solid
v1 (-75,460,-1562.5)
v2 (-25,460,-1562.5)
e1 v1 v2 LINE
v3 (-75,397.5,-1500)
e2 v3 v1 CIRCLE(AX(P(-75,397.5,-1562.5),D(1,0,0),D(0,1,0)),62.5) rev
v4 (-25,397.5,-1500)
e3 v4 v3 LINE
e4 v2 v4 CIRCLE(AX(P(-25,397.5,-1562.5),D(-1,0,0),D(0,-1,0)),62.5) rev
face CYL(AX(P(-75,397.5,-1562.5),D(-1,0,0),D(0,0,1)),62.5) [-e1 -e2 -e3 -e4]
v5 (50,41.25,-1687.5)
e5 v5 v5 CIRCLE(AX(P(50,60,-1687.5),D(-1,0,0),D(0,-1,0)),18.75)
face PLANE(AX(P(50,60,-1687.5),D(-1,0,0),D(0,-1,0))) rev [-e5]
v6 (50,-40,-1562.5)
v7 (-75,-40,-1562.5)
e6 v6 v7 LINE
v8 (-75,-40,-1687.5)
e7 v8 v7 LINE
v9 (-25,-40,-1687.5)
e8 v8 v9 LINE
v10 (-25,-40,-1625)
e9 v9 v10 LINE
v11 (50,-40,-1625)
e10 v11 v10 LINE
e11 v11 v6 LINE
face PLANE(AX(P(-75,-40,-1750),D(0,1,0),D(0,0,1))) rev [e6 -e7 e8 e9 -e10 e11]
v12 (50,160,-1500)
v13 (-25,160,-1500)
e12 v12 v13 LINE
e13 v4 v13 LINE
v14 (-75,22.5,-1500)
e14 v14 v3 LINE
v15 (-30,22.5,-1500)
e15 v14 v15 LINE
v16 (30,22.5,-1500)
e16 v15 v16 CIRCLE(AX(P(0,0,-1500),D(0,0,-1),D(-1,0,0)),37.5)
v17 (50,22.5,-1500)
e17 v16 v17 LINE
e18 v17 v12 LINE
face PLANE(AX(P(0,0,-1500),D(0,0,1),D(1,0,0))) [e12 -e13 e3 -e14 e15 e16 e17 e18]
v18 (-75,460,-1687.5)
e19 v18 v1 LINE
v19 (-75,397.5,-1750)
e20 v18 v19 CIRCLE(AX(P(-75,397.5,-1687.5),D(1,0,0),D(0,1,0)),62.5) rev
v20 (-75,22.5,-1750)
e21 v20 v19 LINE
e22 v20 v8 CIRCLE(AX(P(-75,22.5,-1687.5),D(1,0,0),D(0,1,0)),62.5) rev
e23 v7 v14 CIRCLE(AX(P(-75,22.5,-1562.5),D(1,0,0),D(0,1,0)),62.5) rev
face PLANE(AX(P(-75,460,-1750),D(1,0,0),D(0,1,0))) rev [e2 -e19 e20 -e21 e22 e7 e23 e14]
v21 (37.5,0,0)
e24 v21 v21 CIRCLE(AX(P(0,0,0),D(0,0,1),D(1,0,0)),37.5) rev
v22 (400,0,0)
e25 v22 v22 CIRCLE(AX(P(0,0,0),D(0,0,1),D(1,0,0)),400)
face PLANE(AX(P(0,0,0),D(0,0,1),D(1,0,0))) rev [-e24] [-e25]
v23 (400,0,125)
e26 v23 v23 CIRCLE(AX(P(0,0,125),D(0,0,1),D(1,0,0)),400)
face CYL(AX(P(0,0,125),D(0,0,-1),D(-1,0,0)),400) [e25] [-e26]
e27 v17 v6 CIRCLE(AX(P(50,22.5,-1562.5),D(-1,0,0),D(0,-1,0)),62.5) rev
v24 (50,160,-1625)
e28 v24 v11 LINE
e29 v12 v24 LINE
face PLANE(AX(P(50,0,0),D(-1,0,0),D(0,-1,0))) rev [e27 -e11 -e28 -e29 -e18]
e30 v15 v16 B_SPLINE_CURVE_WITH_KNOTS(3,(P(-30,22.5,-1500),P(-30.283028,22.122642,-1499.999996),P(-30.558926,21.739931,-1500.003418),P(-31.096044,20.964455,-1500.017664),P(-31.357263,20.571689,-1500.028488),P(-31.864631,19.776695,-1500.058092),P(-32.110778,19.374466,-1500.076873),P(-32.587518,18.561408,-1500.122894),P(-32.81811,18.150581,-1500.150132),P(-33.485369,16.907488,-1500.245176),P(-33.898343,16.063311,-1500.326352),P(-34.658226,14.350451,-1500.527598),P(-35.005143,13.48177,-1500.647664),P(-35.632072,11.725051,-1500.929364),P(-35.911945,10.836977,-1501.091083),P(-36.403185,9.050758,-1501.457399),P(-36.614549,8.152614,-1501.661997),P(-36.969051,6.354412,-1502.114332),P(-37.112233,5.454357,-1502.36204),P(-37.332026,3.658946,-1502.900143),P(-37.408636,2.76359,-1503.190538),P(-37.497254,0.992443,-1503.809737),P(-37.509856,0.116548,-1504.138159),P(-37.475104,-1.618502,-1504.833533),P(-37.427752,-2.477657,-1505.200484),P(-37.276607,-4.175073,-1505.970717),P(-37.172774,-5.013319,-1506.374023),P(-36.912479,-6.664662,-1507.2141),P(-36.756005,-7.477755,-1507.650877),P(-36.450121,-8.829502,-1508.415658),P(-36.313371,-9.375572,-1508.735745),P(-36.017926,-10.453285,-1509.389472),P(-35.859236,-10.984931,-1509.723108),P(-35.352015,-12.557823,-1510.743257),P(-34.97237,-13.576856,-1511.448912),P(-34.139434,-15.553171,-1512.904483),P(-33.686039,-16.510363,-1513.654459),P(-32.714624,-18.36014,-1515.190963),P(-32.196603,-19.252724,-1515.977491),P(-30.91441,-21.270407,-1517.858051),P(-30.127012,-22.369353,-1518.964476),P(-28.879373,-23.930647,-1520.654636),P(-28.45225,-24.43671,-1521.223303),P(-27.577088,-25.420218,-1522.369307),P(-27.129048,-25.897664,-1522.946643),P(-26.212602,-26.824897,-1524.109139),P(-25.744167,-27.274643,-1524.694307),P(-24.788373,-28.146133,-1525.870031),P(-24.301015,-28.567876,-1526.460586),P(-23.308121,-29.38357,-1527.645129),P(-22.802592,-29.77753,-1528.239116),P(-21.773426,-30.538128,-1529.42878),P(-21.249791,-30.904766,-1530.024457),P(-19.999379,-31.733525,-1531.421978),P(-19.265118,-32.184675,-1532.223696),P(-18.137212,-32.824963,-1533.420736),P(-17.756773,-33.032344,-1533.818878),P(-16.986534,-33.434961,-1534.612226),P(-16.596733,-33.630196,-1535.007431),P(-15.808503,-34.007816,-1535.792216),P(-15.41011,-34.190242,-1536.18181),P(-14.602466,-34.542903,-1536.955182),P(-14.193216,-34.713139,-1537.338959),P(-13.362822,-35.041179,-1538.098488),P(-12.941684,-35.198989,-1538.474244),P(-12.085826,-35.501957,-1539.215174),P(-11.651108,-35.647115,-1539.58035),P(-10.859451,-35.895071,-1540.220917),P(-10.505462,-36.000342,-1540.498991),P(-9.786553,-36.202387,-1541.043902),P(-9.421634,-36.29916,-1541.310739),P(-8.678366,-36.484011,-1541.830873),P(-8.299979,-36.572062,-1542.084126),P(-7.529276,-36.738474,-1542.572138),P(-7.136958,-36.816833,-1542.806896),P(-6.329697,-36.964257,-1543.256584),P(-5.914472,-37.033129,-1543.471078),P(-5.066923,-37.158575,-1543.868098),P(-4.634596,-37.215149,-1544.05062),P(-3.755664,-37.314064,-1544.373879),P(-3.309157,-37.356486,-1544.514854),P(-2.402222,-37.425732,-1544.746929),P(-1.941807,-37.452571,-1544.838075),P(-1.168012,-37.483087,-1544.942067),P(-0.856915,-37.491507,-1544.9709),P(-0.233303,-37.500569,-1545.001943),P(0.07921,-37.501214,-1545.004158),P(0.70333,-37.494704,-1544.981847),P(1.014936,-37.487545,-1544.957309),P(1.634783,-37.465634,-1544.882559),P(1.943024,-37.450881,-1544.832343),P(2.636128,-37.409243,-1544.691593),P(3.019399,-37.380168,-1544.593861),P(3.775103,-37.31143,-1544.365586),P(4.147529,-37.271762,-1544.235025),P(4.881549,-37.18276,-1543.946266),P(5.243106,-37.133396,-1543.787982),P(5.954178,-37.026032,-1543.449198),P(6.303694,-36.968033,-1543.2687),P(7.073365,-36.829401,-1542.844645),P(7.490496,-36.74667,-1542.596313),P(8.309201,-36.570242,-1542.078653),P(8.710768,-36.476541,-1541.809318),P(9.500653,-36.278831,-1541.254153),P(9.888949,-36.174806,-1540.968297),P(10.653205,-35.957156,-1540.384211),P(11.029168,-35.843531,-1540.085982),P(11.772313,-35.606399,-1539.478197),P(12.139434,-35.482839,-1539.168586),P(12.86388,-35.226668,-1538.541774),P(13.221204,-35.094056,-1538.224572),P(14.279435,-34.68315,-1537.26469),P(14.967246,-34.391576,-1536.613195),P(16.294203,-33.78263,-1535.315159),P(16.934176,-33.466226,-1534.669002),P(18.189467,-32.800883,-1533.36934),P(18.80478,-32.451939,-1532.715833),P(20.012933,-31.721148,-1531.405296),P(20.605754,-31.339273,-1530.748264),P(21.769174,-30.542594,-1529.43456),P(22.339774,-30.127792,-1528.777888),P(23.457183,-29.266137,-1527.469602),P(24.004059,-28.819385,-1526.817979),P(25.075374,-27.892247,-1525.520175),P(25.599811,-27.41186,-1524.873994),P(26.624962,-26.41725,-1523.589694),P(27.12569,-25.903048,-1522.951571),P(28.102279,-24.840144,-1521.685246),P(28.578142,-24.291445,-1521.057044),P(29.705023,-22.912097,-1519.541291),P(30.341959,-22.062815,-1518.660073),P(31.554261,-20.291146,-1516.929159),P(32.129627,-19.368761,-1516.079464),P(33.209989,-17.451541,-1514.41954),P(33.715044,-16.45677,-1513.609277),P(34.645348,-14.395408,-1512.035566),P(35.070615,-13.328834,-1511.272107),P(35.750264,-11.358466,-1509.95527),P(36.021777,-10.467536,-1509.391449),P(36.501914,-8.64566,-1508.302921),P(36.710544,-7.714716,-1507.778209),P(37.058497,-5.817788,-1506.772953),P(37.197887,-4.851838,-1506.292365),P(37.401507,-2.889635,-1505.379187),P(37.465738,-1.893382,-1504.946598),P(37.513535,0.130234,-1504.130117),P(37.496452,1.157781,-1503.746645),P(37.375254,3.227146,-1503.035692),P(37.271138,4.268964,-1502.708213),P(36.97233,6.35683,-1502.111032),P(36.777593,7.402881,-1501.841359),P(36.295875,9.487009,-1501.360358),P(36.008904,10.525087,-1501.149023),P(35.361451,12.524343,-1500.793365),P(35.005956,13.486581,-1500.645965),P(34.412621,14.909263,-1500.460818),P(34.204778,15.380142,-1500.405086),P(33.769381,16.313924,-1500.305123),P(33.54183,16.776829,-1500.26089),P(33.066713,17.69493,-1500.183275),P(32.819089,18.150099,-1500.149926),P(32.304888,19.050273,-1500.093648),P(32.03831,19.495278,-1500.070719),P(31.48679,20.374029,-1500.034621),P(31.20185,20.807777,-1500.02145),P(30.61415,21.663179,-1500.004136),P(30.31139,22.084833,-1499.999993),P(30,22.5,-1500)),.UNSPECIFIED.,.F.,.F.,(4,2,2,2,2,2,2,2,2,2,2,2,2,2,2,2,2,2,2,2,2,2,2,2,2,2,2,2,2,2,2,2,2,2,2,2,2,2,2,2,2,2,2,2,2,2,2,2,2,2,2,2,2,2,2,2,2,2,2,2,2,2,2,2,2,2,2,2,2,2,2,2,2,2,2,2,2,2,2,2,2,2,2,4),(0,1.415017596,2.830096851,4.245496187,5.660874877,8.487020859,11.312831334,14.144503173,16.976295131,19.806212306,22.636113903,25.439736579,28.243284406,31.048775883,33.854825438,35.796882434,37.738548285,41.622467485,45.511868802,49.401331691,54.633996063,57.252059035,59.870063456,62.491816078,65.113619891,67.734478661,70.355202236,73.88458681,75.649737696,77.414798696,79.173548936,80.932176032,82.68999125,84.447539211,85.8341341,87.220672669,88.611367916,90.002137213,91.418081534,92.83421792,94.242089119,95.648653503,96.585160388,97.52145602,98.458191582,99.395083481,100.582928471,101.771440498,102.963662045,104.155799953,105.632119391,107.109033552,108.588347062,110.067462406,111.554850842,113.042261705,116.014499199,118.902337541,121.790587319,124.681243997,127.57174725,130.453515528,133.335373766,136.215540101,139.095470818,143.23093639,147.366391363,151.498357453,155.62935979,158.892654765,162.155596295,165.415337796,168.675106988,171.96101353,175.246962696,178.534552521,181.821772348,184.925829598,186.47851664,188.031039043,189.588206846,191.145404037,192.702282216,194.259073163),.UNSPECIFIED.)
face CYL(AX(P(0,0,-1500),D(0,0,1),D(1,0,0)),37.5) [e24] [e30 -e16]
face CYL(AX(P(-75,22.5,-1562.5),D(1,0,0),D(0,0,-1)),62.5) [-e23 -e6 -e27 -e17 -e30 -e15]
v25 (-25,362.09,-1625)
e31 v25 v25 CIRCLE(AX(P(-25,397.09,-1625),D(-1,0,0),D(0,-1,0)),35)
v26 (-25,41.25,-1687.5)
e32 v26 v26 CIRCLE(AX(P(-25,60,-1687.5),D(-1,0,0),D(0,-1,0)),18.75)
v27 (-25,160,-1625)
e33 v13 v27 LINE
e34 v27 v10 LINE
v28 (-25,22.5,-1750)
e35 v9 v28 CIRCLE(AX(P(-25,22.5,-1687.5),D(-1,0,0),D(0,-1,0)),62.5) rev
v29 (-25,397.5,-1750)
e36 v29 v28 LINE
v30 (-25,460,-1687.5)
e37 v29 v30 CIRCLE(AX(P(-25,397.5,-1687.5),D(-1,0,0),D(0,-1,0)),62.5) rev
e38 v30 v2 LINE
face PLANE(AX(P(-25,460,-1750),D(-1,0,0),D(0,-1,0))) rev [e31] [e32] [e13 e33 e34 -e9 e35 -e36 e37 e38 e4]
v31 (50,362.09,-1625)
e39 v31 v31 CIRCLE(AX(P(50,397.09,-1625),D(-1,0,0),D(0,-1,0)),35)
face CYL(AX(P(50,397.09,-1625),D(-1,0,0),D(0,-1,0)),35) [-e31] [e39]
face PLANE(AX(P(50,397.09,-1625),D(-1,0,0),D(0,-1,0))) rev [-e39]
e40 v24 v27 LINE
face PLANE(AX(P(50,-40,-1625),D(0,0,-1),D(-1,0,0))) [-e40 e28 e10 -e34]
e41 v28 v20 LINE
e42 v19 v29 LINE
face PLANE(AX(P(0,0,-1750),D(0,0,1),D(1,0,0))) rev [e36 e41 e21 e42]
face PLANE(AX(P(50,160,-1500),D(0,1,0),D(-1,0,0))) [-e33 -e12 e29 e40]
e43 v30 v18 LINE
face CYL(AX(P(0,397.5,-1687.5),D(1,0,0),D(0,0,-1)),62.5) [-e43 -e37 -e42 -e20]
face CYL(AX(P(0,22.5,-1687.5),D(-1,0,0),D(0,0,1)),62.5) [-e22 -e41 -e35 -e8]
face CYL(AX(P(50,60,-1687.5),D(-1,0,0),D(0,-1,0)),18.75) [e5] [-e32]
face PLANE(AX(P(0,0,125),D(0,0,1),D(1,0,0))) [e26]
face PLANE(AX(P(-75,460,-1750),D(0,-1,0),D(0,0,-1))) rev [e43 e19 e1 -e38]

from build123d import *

# Parameters (mm, degrees)
SKETCH1_R           = 400
BOSS_EXTRUDE1_DEPTH = 125
SKETCH2_R           = 37.5
BOSS_EXTRUDE2_DEPTH = 1500
SKETCH3_W           = 50
SKETCH3_H           = 500
BOSS_EXTRUDE3_DEPTH = 250
SKETCH4_R           = 18.75
SKETCH4_R_2         = 35
SKETCH4_W           = 125
SKETCH4_H           = 200
BOSS_EXTRUDE4_DEPTH = 75
FILLET1_R           = 62.5


with BuildPart() as part:
    # Sketch1 → Boss-Extrude1 (new body)
    with BuildSketch(Plane.XY):
        Circle(SKETCH1_R)
    extrude(amount=BOSS_EXTRUDE1_DEPTH)

    # Sketch2 → Boss-Extrude2 (add)
    with BuildSketch(Plane(origin=(0, 0, 0), x_dir=(-1, 0, 0), z_dir=(0, 0, -1))):
        with Locations(Location((0, 0, 0), (0, 0, 180))):
            Circle(SKETCH2_R)
    extrude(amount=BOSS_EXTRUDE2_DEPTH)

    # Sketch3 → Boss-Extrude3 (add)
    with BuildSketch(Plane(origin=(0, 0, -1500), x_dir=(-1, 0, 0), z_dir=(0, 0, -1))):
        with Locations((50, 210)):
            Rectangle(SKETCH3_W, SKETCH3_H)
    extrude(amount=BOSS_EXTRUDE3_DEPTH)

    # Sketch4 → Boss-Extrude4 (add)
    with BuildSketch(Plane.ZY.offset(25)):
        with Locations(Location((-1687.5, 60, 0), (0, 0, 270))):
            Circle(SKETCH4_R)
        with Locations(Location((-1625, 397.09, 0), (0, 0, 270))):
            Circle(SKETCH4_R_2)
        with Locations((-1562.5, 60)):
            Rectangle(SKETCH4_W, SKETCH4_H)
    extrude(amount=-BOSS_EXTRUDE4_DEPTH)

    # Fillet1
    # the kernel refuses this fillet: 62.5 mm, written as the material it takes off along each edge
    with BuildSketch(Plane(origin=(-231.25, 460, -1500), x_dir=(0, -1, 0), z_dir=(1, 0, 0))) as fillet1_piece_1:
        with BuildLine():
            CenterArc((FILLET1_R, FILLET1_R), FILLET1_R, 180, 90)
            Line((0, FILLET1_R), (0, 0))
            Line((0, 0), (FILLET1_R, 0))
        make_face()
    extrude(amount=362.5, mode=Mode.SUBTRACT)
    with BuildSketch(Plane(origin=(-231.25, -40, -1500), x_dir=(0, 1, 0), z_dir=(1, 0, 0))) as fillet1_piece_2_section:
        with BuildLine():
            CenterArc((FILLET1_R, -FILLET1_R), FILLET1_R, 90, 90)
            Line((0, -FILLET1_R), (0, 0))
            Line((0, 0), (FILLET1_R, 0))
        make_face()
    fillet1_piece_2 = extrude(amount=437.5, mode=Mode.PRIVATE)
    fillet1_piece_2 = fillet1_piece_2 - Plane(origin=(0, 0, -1501.420624631), x_dir=(1, 0, 0), z_dir=(0, 0, 1)) * Cylinder(37.5, 1125, mode=Mode.PRIVATE)
    add(fillet1_piece_2, mode=Mode.SUBTRACT)
    with BuildSketch(Plane(origin=(-231.25, 460, -1750), x_dir=(0, -1, 0), z_dir=(1, 0, 0)), Plane(origin=(131.25, -40, -1750), x_dir=(0, 1, 0), z_dir=(-1, 0, 0))) as fillet1_piece_3:
        with BuildLine():
            CenterArc((FILLET1_R, -FILLET1_R), FILLET1_R, 90, 90)
            Line((0, -FILLET1_R), (0, 0))
            Line((0, 0), (FILLET1_R, 0))
        make_face()
    extrude(amount=362.5, mode=Mode.SUBTRACT)


solid = part.part
